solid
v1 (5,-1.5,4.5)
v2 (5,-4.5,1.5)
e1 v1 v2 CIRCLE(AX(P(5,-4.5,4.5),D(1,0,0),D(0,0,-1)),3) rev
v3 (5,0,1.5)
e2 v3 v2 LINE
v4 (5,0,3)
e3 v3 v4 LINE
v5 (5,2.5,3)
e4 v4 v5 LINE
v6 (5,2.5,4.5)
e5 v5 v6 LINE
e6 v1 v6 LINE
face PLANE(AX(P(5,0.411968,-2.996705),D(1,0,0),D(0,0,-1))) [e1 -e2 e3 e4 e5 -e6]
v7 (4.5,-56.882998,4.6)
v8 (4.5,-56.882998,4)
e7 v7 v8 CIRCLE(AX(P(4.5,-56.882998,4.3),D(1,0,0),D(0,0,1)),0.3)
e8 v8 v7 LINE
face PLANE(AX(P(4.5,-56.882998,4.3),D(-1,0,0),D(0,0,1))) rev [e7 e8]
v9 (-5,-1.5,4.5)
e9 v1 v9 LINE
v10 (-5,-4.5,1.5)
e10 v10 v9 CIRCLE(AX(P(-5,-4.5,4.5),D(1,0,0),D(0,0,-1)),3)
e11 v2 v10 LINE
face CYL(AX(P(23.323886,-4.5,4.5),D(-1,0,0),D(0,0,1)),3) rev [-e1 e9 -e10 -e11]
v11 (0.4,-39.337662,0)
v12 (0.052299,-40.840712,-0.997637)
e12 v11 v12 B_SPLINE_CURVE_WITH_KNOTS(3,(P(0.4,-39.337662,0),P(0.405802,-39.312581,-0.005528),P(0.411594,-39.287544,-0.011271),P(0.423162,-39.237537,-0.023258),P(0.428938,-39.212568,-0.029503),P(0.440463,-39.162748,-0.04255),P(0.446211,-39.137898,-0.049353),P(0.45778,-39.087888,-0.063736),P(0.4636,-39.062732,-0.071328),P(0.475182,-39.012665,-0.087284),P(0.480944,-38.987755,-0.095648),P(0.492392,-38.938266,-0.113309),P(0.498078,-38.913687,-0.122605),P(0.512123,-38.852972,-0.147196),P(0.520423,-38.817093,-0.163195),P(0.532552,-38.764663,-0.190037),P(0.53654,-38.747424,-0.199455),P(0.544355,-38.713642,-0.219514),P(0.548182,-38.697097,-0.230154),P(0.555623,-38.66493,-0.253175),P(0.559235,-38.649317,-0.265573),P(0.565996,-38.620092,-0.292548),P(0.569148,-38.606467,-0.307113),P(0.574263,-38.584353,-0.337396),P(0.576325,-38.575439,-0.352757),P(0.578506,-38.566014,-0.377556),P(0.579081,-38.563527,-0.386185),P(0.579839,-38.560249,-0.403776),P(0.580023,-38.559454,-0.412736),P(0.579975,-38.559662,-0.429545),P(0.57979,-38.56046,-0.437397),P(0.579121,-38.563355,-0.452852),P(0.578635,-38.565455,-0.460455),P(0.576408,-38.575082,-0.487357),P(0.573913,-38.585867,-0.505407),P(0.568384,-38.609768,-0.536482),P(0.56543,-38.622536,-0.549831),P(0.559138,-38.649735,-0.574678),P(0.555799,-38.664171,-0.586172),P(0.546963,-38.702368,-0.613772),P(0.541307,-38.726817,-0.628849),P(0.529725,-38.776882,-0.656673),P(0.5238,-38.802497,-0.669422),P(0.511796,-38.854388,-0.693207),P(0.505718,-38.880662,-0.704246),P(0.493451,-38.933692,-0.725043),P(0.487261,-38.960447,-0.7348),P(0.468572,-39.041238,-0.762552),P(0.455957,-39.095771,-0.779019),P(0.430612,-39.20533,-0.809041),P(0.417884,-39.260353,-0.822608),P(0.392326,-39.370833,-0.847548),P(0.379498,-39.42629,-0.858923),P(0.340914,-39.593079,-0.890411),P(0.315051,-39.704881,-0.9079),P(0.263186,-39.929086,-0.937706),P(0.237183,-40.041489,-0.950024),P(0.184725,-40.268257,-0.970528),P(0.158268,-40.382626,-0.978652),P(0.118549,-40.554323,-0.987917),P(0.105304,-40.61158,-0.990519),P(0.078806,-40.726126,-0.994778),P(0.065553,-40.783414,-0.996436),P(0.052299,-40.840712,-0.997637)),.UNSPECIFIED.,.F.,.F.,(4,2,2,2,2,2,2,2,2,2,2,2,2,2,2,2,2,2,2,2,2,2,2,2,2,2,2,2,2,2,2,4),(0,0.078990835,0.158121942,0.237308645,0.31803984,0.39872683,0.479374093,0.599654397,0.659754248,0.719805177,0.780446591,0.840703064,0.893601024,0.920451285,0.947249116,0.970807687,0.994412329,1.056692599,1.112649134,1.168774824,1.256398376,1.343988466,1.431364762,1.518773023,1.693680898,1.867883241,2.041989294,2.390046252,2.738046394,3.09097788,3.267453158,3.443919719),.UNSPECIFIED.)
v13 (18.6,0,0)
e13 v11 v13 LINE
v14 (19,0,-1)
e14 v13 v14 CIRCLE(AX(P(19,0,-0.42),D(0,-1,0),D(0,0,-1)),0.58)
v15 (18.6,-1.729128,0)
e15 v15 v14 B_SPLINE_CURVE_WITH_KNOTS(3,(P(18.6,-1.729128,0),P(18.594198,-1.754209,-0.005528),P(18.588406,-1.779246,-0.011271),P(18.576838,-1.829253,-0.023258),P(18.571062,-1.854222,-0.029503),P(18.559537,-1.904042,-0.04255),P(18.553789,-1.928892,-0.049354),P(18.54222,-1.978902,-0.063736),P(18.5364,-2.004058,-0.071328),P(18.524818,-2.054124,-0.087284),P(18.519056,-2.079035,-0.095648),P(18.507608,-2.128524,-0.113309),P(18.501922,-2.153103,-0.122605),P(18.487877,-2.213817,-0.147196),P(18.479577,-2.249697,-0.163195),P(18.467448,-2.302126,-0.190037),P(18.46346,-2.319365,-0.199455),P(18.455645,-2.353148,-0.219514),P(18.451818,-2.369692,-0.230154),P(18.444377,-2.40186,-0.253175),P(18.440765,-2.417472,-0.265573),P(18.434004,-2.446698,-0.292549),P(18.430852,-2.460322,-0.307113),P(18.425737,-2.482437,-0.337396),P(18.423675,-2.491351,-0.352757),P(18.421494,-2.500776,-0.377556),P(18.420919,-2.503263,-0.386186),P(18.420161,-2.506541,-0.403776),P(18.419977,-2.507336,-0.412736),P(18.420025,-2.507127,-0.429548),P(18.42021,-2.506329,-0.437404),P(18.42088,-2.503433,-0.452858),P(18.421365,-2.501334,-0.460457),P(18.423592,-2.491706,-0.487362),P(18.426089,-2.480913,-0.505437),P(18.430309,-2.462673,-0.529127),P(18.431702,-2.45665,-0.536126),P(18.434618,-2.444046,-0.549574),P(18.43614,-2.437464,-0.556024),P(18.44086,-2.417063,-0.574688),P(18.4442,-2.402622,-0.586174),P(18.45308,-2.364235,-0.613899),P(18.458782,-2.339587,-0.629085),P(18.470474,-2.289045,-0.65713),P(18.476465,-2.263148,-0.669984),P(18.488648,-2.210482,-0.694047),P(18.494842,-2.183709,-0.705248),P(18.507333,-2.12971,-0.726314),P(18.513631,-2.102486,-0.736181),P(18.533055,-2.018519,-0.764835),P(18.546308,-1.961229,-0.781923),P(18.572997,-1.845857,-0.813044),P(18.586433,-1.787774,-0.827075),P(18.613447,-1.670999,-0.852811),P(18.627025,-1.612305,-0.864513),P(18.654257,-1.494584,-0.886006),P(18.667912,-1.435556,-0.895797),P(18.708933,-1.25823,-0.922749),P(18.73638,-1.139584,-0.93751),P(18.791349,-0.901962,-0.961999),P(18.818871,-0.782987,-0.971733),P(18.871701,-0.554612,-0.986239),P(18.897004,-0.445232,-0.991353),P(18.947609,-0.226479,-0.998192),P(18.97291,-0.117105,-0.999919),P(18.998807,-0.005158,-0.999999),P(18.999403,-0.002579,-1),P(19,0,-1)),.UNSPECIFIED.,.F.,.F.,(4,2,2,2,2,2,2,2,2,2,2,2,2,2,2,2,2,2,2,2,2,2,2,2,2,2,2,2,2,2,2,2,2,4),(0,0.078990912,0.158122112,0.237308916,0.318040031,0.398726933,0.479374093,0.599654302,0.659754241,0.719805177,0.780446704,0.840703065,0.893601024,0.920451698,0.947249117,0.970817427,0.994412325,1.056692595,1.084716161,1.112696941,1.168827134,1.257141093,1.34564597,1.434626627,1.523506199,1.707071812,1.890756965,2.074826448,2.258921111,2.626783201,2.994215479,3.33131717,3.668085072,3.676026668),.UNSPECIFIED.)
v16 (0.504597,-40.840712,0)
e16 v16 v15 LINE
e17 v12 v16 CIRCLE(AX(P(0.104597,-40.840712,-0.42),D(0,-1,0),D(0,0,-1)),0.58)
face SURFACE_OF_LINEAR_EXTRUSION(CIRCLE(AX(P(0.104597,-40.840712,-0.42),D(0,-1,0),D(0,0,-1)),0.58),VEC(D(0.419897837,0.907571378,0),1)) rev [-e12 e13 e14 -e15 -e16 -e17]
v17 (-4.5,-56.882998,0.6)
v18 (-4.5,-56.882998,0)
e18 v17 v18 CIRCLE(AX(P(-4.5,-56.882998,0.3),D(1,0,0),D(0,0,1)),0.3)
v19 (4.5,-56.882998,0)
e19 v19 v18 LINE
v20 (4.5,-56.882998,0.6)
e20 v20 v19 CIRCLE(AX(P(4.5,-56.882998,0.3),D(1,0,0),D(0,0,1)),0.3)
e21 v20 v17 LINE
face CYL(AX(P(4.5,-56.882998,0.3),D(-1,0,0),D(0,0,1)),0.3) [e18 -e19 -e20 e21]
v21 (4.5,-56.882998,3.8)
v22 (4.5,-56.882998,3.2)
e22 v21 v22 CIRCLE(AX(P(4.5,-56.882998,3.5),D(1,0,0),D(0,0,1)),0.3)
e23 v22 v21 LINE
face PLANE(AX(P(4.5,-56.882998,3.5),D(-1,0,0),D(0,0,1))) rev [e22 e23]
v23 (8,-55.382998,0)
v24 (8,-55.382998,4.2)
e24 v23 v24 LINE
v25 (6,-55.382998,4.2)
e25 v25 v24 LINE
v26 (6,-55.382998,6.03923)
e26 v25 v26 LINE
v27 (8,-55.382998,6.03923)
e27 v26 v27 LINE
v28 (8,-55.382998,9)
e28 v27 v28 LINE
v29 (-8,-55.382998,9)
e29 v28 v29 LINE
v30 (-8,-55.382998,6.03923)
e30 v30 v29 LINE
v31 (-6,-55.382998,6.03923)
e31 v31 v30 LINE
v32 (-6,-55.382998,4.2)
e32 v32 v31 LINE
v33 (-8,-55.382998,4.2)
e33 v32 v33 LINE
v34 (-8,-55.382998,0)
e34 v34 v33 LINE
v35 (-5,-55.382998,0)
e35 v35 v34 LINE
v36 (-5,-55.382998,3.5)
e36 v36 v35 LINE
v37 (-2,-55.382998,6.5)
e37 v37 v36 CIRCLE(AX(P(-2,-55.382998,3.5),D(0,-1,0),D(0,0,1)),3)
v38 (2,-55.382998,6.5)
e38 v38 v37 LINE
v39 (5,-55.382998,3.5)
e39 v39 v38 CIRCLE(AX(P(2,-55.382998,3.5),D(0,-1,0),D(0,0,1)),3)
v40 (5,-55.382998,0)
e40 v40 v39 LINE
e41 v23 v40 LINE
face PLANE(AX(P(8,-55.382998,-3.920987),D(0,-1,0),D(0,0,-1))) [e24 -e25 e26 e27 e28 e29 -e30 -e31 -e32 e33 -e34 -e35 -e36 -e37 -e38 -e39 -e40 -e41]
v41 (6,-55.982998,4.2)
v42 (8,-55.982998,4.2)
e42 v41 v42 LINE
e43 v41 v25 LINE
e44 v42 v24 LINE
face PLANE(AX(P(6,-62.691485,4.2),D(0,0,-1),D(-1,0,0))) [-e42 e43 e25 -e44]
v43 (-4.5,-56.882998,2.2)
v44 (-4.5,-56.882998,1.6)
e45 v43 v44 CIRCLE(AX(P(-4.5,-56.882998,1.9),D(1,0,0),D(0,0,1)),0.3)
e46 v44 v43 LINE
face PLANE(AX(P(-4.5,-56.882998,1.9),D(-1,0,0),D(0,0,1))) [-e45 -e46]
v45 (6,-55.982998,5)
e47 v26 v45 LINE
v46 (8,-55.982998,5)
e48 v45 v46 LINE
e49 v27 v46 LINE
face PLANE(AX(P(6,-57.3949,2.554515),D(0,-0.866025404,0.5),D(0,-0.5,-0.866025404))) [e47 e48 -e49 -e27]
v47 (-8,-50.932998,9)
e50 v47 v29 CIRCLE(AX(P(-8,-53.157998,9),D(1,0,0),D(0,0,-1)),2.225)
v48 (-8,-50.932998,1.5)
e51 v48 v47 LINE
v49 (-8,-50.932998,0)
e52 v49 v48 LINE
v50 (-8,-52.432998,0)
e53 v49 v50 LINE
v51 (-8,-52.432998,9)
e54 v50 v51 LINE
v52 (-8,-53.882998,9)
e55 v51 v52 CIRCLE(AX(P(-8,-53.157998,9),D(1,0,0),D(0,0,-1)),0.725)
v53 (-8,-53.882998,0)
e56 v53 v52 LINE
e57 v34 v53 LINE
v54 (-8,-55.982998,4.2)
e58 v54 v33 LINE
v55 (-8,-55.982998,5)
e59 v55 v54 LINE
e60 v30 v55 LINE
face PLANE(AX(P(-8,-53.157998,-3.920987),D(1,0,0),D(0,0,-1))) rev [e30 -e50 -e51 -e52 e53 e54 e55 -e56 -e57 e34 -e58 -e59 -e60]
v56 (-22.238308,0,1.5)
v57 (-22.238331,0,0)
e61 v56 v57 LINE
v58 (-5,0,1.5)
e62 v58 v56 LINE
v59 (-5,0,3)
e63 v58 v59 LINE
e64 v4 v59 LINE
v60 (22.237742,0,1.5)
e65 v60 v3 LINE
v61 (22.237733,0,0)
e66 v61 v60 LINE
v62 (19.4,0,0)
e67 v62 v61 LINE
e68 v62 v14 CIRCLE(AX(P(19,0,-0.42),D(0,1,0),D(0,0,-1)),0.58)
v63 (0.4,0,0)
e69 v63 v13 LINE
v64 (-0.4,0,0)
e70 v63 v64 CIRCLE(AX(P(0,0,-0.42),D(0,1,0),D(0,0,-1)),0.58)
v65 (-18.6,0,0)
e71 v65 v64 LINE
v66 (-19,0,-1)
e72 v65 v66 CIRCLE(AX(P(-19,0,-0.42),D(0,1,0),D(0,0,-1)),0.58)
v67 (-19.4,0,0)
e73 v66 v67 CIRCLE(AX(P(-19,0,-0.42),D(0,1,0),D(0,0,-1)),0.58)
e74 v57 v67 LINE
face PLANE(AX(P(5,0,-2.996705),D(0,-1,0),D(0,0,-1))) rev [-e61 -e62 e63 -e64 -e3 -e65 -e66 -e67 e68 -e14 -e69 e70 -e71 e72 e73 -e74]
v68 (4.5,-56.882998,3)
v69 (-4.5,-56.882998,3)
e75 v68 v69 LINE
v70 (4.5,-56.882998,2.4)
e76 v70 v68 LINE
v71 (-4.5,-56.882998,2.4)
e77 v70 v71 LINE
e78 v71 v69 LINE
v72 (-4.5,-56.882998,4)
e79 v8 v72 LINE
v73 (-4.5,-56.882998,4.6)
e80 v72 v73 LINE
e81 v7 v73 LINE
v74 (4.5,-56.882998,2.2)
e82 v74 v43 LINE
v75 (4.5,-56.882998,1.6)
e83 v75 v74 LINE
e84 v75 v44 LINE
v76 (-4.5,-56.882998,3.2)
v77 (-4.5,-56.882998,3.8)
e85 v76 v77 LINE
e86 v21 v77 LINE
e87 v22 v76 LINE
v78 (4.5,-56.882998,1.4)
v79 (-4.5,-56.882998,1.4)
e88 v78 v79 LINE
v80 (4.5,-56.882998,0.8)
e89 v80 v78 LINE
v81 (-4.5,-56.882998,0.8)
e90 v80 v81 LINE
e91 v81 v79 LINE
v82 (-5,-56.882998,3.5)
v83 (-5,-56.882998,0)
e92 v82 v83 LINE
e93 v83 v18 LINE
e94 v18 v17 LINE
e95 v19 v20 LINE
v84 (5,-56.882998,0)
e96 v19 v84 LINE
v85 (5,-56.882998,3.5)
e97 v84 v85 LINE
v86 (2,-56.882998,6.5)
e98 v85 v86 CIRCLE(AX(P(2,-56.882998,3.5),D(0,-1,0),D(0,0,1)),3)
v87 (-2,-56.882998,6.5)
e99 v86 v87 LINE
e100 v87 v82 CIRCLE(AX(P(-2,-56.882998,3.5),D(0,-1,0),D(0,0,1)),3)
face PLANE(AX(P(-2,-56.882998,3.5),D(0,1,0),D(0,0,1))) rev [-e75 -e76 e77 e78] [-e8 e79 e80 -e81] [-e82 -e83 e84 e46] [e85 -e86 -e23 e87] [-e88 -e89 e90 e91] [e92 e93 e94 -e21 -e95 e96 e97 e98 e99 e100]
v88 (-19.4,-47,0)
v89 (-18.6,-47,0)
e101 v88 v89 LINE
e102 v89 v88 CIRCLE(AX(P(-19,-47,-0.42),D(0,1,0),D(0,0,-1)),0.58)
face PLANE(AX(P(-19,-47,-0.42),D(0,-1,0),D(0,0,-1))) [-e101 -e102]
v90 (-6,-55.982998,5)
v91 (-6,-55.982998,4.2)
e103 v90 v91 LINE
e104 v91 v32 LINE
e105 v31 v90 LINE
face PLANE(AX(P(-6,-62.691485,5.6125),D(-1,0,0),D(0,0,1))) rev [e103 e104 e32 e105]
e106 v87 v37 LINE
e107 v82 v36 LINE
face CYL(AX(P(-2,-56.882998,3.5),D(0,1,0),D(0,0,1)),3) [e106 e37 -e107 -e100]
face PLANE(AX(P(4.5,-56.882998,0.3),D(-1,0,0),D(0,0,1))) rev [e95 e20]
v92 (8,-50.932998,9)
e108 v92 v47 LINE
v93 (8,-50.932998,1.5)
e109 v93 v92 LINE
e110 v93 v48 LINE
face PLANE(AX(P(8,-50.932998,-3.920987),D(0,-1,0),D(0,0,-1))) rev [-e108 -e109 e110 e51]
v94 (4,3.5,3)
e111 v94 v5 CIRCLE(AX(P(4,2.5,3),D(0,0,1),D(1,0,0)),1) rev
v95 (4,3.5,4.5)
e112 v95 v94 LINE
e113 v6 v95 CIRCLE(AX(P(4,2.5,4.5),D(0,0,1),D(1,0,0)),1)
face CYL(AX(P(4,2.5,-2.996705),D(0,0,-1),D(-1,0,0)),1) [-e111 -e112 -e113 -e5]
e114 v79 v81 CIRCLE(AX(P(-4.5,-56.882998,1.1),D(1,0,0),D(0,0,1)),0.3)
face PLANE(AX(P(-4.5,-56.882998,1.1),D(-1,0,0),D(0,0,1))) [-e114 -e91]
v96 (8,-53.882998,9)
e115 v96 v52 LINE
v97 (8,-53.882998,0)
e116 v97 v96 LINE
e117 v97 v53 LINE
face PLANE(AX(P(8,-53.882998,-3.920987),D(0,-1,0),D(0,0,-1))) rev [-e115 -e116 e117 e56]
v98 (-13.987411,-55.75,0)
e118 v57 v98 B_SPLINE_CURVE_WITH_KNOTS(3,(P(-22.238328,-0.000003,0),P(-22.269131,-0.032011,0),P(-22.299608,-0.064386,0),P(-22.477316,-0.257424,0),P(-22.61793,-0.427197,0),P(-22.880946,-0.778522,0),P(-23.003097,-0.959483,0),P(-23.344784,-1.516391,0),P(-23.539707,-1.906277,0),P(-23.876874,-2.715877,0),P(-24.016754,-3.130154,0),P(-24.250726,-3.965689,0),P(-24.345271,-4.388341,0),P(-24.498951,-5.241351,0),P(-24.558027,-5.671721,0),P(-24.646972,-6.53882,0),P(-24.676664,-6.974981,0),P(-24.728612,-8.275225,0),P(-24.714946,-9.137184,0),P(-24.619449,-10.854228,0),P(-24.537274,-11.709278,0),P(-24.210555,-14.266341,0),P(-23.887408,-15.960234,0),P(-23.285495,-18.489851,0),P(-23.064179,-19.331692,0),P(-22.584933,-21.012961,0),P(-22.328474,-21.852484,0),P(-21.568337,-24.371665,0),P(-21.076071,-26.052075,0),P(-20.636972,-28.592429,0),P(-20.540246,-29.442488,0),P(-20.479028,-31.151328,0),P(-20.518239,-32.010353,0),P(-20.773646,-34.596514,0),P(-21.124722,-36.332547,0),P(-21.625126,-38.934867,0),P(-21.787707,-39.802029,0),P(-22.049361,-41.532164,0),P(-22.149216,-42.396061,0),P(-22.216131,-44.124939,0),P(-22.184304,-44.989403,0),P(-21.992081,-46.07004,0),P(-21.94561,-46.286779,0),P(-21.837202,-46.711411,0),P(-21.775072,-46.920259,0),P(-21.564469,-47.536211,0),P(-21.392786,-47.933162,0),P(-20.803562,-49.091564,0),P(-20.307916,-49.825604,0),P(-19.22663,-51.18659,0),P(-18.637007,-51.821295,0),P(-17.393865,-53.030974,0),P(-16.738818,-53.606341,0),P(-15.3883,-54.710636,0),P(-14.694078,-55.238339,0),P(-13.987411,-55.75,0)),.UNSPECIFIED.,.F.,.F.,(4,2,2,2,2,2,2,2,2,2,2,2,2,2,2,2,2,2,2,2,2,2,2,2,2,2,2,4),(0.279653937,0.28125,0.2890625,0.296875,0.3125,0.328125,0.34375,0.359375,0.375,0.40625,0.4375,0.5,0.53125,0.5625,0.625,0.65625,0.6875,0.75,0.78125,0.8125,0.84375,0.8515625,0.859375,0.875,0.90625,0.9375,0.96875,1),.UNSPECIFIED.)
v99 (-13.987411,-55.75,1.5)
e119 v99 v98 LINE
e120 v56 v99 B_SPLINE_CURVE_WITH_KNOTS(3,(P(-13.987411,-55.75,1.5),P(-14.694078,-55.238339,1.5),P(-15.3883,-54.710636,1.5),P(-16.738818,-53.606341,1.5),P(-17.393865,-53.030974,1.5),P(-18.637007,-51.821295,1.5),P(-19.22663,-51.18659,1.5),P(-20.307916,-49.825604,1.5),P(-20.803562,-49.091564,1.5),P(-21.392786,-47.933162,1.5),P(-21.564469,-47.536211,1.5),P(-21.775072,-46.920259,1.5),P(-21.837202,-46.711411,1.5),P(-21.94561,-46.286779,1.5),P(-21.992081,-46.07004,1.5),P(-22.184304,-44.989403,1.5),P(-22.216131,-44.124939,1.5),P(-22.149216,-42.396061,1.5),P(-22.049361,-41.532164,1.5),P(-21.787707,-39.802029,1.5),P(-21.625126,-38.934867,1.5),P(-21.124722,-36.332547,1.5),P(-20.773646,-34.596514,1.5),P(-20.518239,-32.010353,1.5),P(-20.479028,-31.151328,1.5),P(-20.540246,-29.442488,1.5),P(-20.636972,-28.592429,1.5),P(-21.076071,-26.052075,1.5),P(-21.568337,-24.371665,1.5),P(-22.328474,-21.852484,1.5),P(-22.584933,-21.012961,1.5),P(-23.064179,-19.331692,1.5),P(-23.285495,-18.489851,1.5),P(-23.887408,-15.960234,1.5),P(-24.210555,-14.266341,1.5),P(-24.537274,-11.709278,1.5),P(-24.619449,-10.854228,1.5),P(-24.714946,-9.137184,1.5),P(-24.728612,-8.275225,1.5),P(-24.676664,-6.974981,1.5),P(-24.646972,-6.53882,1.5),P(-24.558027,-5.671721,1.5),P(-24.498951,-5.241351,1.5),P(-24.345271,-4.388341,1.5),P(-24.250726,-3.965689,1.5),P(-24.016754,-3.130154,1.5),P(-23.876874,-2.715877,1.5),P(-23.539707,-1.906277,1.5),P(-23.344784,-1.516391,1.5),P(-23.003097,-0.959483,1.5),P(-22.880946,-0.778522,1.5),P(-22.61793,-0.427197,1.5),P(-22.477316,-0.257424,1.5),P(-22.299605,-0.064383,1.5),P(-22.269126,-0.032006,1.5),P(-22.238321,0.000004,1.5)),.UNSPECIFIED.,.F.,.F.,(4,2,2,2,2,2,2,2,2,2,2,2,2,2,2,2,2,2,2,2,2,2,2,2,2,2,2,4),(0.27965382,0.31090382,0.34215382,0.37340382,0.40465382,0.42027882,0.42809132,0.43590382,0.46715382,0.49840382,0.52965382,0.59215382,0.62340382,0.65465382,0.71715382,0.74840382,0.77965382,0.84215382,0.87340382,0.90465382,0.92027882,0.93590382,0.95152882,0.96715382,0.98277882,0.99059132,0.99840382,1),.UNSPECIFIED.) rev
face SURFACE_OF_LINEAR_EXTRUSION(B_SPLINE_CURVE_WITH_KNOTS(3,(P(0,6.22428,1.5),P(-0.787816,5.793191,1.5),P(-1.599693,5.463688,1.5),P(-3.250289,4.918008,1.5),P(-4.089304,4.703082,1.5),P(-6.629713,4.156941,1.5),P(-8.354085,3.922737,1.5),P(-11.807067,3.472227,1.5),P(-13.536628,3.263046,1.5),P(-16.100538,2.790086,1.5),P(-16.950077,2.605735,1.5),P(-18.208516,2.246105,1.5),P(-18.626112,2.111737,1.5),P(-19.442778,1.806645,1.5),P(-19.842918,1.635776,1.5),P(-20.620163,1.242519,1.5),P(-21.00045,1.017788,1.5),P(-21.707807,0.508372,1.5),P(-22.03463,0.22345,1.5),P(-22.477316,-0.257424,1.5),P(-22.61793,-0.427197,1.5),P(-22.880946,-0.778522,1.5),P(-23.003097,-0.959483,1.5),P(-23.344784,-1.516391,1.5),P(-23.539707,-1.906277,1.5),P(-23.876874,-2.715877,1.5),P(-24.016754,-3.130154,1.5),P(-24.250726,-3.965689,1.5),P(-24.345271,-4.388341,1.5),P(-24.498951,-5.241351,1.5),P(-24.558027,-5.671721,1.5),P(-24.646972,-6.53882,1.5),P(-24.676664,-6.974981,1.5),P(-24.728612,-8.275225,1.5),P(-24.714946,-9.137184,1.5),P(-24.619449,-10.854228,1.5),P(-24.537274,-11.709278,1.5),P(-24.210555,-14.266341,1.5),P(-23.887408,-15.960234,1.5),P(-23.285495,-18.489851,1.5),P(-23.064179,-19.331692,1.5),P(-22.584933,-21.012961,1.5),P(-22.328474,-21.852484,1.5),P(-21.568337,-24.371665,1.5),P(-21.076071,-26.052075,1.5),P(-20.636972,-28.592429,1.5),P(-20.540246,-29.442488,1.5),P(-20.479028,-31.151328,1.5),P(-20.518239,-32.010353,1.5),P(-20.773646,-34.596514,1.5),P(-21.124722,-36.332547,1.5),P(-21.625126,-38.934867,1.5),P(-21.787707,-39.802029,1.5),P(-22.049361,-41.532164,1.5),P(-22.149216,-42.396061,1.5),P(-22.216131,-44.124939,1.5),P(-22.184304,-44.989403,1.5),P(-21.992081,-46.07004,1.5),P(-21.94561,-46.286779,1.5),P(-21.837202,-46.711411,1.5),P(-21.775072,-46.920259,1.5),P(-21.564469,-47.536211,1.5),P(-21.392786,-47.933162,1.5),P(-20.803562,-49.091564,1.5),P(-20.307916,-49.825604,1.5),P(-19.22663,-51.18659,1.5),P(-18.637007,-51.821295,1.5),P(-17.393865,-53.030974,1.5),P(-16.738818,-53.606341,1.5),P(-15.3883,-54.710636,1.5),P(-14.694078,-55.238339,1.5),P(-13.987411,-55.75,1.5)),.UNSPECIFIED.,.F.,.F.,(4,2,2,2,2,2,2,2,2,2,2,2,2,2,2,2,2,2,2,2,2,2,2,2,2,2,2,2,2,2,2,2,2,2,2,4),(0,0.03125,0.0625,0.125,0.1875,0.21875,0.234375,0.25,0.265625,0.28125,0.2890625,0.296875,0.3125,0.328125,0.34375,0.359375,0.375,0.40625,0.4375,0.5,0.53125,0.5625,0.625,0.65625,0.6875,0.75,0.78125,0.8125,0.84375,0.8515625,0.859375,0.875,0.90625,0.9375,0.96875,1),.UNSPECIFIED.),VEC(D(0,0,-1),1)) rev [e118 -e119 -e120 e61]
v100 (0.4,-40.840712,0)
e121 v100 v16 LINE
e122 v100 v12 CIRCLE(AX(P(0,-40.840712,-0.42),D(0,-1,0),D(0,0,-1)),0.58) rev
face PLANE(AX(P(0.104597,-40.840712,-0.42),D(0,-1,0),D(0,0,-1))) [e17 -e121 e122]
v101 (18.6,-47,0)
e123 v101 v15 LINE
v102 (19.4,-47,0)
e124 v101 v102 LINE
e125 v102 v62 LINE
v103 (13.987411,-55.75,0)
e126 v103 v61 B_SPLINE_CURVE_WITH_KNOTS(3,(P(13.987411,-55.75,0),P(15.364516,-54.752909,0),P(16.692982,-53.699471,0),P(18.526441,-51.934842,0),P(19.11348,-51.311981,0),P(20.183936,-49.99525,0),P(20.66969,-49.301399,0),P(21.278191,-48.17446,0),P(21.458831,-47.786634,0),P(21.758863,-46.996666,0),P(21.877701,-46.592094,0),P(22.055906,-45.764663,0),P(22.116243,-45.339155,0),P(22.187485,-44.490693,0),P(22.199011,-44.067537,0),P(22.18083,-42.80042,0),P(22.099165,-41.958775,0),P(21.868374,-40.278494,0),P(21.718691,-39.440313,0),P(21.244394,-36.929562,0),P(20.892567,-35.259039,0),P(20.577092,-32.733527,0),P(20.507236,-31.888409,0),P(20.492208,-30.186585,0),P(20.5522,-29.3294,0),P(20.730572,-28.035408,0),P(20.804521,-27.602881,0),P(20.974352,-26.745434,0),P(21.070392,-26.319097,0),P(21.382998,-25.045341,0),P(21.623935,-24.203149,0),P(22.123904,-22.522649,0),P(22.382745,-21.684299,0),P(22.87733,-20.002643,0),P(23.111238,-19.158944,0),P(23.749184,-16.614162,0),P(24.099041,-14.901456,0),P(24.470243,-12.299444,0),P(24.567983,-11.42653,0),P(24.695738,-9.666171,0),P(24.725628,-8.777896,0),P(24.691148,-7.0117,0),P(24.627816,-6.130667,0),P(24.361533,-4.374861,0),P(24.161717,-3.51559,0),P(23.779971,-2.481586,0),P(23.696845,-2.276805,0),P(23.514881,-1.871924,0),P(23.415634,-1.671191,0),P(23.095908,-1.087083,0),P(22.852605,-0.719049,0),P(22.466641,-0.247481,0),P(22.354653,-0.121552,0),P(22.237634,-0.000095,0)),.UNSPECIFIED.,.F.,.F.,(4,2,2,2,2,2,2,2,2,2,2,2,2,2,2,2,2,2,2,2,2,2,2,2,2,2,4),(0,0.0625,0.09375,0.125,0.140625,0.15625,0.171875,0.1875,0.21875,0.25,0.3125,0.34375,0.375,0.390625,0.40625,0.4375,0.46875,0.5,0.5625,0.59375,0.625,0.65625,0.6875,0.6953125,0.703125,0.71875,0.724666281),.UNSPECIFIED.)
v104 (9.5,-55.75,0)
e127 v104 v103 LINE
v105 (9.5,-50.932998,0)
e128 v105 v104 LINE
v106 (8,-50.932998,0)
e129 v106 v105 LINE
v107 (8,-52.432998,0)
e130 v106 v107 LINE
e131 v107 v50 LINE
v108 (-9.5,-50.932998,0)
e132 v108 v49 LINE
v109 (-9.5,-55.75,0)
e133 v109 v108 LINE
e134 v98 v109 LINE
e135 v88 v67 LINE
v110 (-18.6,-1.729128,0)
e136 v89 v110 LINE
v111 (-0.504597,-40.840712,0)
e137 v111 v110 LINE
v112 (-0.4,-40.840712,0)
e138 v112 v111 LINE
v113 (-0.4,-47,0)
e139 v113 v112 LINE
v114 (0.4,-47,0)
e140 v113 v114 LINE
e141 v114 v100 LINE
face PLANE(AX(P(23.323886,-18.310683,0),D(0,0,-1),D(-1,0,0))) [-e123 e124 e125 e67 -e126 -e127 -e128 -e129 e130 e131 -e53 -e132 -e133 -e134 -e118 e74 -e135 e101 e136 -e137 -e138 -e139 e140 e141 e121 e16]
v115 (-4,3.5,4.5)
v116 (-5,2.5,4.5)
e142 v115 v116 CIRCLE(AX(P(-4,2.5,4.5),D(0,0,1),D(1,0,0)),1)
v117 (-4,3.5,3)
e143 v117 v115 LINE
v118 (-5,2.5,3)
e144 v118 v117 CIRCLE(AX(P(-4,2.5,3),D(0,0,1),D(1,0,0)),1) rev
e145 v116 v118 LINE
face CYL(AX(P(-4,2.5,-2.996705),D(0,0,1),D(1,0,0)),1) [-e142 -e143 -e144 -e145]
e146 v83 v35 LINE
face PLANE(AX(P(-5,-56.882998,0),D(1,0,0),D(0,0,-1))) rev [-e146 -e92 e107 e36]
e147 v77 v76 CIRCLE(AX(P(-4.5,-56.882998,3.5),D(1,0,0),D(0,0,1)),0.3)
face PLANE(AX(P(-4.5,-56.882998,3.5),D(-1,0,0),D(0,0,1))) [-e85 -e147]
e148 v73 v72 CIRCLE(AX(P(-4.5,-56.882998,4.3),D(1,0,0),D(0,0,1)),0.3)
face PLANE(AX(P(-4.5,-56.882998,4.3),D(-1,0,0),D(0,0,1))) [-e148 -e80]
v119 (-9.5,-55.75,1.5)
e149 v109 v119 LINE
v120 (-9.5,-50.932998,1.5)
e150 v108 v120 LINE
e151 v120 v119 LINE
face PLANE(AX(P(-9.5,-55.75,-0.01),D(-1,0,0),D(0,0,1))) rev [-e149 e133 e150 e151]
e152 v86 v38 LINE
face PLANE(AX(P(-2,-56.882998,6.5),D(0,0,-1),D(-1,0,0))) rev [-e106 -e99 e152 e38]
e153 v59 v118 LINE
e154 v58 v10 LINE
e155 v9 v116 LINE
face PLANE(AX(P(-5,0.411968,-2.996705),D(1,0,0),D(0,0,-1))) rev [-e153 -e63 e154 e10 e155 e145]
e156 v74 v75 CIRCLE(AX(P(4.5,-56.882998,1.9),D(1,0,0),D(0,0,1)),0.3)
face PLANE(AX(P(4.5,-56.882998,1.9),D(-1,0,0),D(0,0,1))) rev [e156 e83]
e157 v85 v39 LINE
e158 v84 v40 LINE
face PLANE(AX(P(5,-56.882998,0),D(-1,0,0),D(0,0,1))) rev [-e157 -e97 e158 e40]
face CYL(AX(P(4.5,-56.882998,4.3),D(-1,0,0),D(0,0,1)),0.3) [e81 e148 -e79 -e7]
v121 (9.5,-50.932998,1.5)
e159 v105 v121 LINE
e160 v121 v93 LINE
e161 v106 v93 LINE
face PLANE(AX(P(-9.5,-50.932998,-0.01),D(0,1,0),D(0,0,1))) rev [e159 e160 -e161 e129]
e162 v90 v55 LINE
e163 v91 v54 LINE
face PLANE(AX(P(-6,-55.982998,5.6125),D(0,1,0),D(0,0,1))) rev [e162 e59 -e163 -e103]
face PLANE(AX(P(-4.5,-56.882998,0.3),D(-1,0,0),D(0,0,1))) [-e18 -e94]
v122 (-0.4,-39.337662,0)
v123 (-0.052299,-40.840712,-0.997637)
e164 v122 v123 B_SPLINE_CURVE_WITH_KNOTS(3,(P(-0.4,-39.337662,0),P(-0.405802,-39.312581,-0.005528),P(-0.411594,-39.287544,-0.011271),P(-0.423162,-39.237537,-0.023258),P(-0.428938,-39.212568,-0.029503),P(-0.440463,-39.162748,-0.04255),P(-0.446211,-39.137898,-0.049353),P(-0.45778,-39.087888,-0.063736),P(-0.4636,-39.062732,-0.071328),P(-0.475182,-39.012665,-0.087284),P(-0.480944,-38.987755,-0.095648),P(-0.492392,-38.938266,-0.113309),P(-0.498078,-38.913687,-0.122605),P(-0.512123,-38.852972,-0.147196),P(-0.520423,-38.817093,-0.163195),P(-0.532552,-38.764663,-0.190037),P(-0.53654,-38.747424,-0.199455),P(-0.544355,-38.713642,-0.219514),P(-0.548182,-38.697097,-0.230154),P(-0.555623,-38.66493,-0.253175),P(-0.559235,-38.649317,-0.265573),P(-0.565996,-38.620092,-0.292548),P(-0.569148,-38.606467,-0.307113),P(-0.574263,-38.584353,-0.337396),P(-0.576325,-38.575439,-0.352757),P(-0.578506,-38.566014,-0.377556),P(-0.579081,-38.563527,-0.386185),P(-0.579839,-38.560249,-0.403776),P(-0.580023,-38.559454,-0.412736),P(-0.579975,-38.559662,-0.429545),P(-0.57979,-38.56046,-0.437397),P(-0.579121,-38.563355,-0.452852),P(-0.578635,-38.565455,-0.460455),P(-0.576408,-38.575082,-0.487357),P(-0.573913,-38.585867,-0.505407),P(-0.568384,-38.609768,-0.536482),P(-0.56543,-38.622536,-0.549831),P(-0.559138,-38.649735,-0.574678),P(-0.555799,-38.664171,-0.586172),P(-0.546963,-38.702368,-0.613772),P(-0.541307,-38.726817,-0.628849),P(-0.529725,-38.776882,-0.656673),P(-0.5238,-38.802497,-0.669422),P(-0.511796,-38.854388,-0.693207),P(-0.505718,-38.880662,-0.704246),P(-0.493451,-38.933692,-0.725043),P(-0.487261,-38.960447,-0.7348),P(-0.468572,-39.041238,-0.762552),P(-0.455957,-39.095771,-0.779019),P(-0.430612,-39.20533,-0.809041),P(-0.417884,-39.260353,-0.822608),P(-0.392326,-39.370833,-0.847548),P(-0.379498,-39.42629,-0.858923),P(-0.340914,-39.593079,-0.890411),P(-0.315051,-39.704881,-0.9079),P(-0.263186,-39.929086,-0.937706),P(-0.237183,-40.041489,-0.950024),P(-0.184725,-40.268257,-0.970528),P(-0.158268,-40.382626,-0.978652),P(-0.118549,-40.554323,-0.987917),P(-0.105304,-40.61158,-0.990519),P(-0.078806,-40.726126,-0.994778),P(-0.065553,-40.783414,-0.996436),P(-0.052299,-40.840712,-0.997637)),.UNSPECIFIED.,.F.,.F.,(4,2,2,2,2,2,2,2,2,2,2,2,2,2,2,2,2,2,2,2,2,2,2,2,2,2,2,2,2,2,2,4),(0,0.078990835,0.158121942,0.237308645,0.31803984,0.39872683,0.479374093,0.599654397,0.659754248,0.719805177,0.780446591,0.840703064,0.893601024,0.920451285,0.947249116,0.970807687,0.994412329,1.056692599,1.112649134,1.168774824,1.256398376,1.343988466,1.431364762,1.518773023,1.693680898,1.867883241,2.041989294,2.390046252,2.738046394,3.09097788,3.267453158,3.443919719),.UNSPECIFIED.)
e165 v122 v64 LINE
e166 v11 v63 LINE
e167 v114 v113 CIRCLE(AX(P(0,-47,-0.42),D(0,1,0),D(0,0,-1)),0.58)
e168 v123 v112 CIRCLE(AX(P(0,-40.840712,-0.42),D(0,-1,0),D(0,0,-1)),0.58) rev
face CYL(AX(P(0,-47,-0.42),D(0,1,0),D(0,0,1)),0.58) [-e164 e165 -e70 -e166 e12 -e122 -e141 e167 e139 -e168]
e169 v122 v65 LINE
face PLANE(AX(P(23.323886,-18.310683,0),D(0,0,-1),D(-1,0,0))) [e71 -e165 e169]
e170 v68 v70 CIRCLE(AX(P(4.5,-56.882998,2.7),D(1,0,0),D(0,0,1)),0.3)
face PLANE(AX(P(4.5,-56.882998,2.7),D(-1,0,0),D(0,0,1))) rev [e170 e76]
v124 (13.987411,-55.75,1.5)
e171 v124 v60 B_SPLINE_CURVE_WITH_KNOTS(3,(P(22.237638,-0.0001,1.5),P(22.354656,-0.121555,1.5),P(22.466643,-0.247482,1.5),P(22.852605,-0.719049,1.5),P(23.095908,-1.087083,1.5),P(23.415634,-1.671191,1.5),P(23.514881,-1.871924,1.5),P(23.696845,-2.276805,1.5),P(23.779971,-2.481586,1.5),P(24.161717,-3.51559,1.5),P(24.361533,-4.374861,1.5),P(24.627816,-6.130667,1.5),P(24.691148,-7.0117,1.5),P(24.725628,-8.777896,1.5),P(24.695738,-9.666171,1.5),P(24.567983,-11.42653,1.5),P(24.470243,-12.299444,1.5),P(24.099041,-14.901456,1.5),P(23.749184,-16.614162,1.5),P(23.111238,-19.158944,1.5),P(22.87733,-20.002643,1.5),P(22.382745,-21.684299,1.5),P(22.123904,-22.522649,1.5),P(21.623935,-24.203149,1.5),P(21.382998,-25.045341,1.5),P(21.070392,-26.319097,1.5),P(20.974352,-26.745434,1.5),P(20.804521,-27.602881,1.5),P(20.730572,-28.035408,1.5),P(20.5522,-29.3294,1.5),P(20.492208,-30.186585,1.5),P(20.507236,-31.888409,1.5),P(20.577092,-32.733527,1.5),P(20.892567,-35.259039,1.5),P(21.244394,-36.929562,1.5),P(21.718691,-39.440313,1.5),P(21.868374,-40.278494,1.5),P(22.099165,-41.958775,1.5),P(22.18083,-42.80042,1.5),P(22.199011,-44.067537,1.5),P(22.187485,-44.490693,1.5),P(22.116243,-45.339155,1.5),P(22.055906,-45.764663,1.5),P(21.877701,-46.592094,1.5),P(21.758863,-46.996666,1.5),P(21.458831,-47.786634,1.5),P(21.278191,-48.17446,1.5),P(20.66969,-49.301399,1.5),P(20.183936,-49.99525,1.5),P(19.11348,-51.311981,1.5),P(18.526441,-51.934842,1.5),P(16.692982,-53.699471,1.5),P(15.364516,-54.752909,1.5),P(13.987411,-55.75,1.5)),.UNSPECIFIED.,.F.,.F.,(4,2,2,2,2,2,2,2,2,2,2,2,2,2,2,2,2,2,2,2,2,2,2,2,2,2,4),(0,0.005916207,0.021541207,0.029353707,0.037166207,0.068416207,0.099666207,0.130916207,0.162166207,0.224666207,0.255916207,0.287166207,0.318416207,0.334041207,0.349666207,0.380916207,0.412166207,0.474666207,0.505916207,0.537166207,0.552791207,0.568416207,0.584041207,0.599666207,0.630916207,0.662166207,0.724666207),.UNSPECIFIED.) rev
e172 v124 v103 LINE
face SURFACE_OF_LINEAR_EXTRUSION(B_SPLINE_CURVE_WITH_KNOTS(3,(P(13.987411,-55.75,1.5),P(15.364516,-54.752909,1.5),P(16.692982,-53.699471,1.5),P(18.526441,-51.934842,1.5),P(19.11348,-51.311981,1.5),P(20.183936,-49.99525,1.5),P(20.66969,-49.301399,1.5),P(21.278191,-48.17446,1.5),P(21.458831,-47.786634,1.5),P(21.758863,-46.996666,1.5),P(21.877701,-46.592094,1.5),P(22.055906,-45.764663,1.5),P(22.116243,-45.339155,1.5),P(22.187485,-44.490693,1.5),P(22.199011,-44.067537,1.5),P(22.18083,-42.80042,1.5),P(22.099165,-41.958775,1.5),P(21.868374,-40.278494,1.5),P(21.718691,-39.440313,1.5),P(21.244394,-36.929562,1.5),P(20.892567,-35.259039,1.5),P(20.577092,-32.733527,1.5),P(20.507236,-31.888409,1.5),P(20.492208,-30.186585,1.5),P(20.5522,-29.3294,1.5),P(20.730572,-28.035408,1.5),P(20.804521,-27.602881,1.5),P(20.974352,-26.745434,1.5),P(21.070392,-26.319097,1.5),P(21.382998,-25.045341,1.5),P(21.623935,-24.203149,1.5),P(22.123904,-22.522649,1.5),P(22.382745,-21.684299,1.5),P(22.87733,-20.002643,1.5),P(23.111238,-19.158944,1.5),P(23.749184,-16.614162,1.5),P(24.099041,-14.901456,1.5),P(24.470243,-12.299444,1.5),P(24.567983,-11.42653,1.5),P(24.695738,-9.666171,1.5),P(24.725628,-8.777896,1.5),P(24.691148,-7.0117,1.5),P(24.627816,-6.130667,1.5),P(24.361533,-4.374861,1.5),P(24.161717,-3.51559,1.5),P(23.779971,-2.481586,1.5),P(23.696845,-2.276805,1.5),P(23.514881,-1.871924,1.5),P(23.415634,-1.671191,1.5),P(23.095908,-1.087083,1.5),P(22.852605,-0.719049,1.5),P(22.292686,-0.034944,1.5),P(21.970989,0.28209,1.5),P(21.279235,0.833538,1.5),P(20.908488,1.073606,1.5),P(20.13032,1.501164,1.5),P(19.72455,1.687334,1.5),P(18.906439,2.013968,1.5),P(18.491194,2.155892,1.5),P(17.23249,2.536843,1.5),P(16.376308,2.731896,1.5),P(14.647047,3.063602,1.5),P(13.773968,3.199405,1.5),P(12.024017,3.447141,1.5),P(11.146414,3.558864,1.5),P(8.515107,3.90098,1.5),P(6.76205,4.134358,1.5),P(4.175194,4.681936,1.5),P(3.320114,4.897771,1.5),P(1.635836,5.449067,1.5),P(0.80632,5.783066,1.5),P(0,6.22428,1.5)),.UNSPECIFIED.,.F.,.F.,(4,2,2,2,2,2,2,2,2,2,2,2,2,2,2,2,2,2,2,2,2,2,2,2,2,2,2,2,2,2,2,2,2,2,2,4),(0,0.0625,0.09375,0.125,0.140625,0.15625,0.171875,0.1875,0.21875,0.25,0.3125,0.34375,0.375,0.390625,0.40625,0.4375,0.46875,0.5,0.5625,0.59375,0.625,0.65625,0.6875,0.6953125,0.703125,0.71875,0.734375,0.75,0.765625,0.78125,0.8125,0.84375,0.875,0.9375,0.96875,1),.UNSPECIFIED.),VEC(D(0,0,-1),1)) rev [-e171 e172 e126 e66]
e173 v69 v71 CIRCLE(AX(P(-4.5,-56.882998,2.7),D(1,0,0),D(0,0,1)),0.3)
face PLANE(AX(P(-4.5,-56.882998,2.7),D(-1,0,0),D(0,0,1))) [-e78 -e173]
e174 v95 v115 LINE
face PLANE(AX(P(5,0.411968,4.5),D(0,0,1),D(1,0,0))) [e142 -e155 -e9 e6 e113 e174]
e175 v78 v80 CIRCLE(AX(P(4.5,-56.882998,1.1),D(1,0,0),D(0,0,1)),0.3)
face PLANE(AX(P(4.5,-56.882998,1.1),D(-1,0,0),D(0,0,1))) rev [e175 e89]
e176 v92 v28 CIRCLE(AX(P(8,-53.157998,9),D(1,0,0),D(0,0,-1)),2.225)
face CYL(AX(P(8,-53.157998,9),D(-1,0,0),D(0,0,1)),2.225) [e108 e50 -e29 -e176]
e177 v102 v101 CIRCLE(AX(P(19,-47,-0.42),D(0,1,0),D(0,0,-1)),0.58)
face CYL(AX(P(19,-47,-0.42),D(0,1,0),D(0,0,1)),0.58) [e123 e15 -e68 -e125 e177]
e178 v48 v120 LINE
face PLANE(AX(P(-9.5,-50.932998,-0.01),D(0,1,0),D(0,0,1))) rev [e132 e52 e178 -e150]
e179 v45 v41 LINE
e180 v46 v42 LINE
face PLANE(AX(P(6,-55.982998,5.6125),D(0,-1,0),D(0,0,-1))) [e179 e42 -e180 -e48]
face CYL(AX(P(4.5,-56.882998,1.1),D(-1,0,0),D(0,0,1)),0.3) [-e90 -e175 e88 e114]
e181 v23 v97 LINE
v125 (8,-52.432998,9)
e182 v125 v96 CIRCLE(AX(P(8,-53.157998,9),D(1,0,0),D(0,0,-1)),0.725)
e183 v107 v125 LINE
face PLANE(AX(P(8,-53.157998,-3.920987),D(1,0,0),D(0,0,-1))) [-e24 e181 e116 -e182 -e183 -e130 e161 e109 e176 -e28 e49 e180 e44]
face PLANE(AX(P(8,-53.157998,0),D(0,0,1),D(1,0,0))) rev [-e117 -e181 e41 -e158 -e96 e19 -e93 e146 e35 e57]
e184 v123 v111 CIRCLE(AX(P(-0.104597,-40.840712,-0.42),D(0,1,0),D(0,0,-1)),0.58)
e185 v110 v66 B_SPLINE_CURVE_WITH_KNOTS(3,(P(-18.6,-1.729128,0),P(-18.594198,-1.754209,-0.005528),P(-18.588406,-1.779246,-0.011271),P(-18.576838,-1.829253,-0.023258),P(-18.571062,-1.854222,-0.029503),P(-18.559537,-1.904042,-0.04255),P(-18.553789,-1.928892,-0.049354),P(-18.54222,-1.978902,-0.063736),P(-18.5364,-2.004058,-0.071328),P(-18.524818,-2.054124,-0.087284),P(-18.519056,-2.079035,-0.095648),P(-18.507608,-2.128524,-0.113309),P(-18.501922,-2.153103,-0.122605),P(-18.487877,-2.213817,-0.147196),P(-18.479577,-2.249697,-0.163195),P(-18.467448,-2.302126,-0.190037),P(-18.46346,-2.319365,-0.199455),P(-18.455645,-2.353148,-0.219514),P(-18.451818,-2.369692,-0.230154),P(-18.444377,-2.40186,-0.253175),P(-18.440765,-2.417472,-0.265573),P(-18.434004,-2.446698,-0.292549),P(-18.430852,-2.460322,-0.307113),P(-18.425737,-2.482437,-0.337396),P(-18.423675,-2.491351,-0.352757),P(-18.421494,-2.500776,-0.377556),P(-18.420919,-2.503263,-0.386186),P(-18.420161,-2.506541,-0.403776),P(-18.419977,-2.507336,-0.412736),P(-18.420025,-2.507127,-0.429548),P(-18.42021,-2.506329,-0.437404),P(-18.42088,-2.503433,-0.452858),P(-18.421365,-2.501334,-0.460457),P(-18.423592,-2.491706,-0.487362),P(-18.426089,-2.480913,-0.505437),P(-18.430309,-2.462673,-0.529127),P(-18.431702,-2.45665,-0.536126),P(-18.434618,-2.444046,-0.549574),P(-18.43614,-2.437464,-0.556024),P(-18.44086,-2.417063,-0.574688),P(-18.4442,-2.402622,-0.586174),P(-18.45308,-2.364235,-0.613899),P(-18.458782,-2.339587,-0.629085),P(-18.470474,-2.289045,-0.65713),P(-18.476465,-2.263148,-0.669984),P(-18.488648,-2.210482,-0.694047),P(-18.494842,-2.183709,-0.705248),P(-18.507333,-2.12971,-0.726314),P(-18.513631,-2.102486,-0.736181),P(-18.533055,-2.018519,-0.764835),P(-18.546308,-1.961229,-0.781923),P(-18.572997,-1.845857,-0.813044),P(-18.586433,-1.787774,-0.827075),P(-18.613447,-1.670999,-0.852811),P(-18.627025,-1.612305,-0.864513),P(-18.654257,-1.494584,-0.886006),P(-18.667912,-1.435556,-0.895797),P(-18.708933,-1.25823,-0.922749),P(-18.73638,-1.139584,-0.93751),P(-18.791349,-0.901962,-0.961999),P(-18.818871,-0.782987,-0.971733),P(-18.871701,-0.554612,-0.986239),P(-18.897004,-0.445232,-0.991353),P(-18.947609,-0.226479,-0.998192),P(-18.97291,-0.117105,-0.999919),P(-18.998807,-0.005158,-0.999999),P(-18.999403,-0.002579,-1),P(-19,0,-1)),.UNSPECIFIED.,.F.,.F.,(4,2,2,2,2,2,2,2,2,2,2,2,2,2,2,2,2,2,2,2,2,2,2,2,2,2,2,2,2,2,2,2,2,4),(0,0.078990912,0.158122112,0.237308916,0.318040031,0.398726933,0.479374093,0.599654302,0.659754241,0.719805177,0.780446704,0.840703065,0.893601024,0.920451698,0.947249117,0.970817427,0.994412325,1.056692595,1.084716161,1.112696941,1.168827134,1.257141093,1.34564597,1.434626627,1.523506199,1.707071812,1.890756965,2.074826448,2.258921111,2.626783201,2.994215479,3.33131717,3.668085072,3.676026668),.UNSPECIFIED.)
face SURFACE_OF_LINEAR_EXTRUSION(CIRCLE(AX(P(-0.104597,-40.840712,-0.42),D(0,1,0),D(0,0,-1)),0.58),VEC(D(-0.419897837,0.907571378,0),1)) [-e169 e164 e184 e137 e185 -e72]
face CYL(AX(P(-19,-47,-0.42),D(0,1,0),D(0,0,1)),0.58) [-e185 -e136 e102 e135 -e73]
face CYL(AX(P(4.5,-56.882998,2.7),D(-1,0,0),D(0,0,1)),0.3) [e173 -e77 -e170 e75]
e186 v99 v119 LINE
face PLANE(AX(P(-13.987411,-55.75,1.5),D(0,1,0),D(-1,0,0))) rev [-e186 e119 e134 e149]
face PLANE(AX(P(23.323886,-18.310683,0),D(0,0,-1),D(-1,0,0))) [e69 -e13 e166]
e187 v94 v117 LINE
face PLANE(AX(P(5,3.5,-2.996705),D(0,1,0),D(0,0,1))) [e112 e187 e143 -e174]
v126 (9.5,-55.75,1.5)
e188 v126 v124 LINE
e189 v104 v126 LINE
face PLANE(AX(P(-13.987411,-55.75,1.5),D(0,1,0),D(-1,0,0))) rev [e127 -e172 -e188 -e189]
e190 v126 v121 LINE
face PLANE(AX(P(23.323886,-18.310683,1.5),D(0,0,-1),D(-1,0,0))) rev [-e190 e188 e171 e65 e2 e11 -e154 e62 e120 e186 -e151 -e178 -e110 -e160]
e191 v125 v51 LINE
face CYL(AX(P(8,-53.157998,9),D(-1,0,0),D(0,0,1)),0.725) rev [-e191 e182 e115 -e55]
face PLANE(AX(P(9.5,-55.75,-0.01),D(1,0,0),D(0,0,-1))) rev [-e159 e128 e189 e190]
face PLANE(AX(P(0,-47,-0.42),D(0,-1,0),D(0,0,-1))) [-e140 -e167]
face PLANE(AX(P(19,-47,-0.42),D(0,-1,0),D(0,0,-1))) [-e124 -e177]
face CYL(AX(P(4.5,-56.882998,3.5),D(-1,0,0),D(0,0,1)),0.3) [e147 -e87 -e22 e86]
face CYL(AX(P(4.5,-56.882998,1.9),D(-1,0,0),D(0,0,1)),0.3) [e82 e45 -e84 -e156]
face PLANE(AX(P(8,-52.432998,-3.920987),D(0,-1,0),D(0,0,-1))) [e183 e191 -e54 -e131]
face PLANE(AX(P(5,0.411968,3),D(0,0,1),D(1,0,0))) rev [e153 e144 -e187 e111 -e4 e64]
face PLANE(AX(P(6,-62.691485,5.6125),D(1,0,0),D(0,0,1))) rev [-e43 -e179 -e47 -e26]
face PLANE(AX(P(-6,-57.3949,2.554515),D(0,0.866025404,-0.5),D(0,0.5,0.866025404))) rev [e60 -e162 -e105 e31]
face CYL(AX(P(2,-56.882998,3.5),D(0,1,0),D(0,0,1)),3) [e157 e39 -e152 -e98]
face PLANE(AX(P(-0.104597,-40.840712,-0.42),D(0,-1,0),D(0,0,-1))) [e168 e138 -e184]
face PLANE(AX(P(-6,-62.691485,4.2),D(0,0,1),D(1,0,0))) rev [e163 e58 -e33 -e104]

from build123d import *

# Parameters (mm, degrees)
LOW_PLATE_DEPTH     = 1.5
SKETCH3_W           = 19
SKETCH3_H           = 4.817001744
CUT_EXTRUDE1_DEPTH  = 62.000496717
SKETCH5_W           = 9
SKETCH5_H           = 1.5
TONGUE_DEPTH        = 8
TONGUE_BUTTON_DEPTH = 1.5
SKETCH7_W           = 4.5
SKETCH7_H           = 1.5
SKETCH7_W_2         = 1.5
SKETCH7_H_2         = 3.5
BOSS_EXTRUDE4_DEPTH = 5
SKETCH8_W           = 3
SKETCH8_H           = 6.224279684
CUT_EXTRUDE2_DEPTH  = 30
FILLET_START        = -5
FILLET_3MM_DEPTH    = 10
FILLET2_R           = 1
SKETCH9_W           = 0.8
SKETCH9_H           = 0.6
RIGHT_CLIPS_DEPTH   = 2
CLIPS_RIBBS_DEPTH   = 4.5
BOSS_EXTRUDE7_DEPTH = 47
BOSS_EXTRUDE8_DEPTH = 45


with BuildPart() as part:
    # Sketch2 → Low Plate (new body)
    with BuildSketch(Plane.XY):
        with BuildLine():
            Line((-13.987410865, -55.75), (13.987410865, -55.75))
            add(Edge.make_bspline(
                [(13.987410865, -55.75), (15.364516245, -54.752908861), (16.692982198, -53.699471161), (18.526440715, -51.934841851), (19.113479504, -51.311981088), (20.183935625, -49.995249875), (20.669689967, -49.301399402), (21.278190693, -48.174460264), (21.458830968, -47.786634264), (21.758862818, -46.996665666), (21.877700551, -46.592093962), (22.0559056, -45.764663188), (22.116243051, -45.339154605), (22.18748451, -44.490693409), (22.199011375, -44.067536932), (22.180829682, -42.800419677), (22.099164736, -41.95877515), (21.868374402, -40.278493527), (21.718690582, -39.440313431), (21.244394379, -36.929561866), (20.892566631, -35.2590388), (20.577091845, -32.733527124), (20.507236183, -31.888409042), (20.492208023, -30.186585415), (20.552200399, -29.32939987), (20.73057206, -28.035407647), (20.804521311, -27.602881393), (20.974351767, -26.745434183), (21.070391606, -26.319097363), (21.382998298, -25.045340626), (21.623934502, -24.203149153), (22.12390442, -22.522649028), (22.38274515, -21.684298971), (22.877329959, -20.00264347), (23.11123752, -19.158944002), (23.749184146, -16.614162445), (24.099040974, -14.901455558), (24.470243393, -12.299444034), (24.567983481, -11.426529836), (24.695738389, -9.666170984), (24.725628098, -8.777896383), (24.691148458, -7.011699611), (24.627815746, -6.130667368), (24.361532714, -4.37486133), (24.161716694, -3.515589704), (23.779971484, -2.48158604), (23.696844615, -2.27680486), (23.514880537, -1.871923627), (23.415633783, -1.67119118), (23.09590805, -1.087082658), (22.852605055, -0.719048656), (22.29268626, -0.03494376), (21.970988856, 0.282090082), (21.279235232, 0.833537602), (20.908488239, 1.073605964), (20.130319718, 1.501163849), (19.724550492, 1.687333637), (18.906439227, 2.013968076), (18.491193707, 2.15589155), (17.232489601, 2.536842993), (16.376307609, 2.731895799), (14.647046711, 3.063601594), (13.773968133, 3.199405493), (12.024016772, 3.447140862), (11.146413812, 3.558864437), (8.515107441, 3.900980238), (6.762049959, 4.134358142), (4.175193681, 4.681936146), (3.320114283, 4.897770661), (1.63583587, 5.449066892), (0.806320369, 5.783065718), (0, 6.224279684)],
                knots=[0, 0, 0, 0, 0.0625, 0.0625, 0.09375, 0.09375, 0.125, 0.125, 0.140625, 0.140625, 0.15625, 0.15625, 0.171875, 0.171875, 0.1875, 0.1875, 0.21875, 0.21875, 0.25, 0.25, 0.3125, 0.3125, 0.34375, 0.34375, 0.375, 0.375, 0.390625, 0.390625, 0.40625, 0.40625, 0.4375, 0.4375, 0.46875, 0.46875, 0.5, 0.5, 0.5625, 0.5625, 0.59375, 0.59375, 0.625, 0.625, 0.65625, 0.65625, 0.6875, 0.6875, 0.6953125, 0.6953125, 0.703125, 0.703125, 0.71875, 0.71875, 0.734375, 0.734375, 0.75, 0.75, 0.765625, 0.765625, 0.78125, 0.78125, 0.8125, 0.8125, 0.84375, 0.84375, 0.875, 0.875, 0.9375, 0.9375, 0.96875, 0.96875, 1, 1, 1, 1], degree=3))
            add(Edge.make_bspline(
                [(0, 6.224279684), (-0.78781572, 5.793191358), (-1.59969269, 5.463688393), (-3.250288628, 4.918007999), (-4.089304063, 4.70308224), (-6.629712981, 4.156940709), (-8.354084583, 3.922737374), (-11.807066612, 3.47222681), (-13.536628271, 3.263046491), (-16.100537752, 2.790086115), (-16.950076528, 2.605735334), (-18.20851631, 2.246104635), (-18.626112374, 2.111737043), (-19.442777675, 1.806644848), (-19.842917847, 1.635776182), (-20.620162533, 1.242519333), (-21.000449987, 1.017788231), (-21.707807481, 0.508371536), (-22.034629769, 0.223449612), (-22.477316066, -0.257423908), (-22.617930469, -0.427196518), (-22.88094555, -0.778522223), (-23.003096797, -0.959483365), (-23.34478427, -1.516391451), (-23.539706693, -1.906276719), (-23.876874208, -2.715877414), (-24.01675437, -3.130154085), (-24.250726219, -3.965689427), (-24.345271274, -4.388340996), (-24.498951121, -5.241350614), (-24.558027347, -5.671721409), (-24.646972495, -6.538819504), (-24.676663881, -6.974981428), (-24.728611977, -8.275225371), (-24.714946447, -9.137184148), (-24.619449188, -10.854227556), (-24.537274438, -11.709277595), (-24.210555404, -14.266340556), (-23.887407569, -15.960234373), (-23.285495324, -18.489850781), (-23.064178692, -19.331692339), (-22.584933476, -21.012960688), (-22.328473597, -21.85248435), (-21.568336586, -24.371664938), (-21.076070946, -26.052074517), (-20.636971825, -28.592429374), (-20.540245663, -29.442488379), (-20.47902807, -31.15132802), (-20.518239419, -32.010352874), (-20.773645661, -34.596514295), (-21.124722079, -36.332547063), (-21.625125581, -38.934867442), (-21.787706997, -39.802029252), (-22.049361302, -41.532164124), (-22.149215918, -42.396061281), (-22.216131051, -44.124939117), (-22.184303618, -44.989402765), (-21.99208071, -46.070040071), (-21.945610298, -46.286779492), (-21.837202033, -46.711410531), (-21.775071919, -46.920258695), (-21.564469479, -47.536211191), (-21.392786311, -47.933161545), (-20.803562128, -49.091563627), (-20.307916123, -49.825604486), (-19.226630089, -51.186589759), (-18.637007111, -51.821294758), (-17.393865498, -53.030973568), (-16.738818031, -53.606341253), (-15.388299543, -54.710635735), (-14.694077635, -55.238338957), (-13.987410865, -55.75)],
                knots=[0, 0, 0, 0, 0.03125, 0.03125, 0.0625, 0.0625, 0.125, 0.125, 0.1875, 0.1875, 0.21875, 0.21875, 0.234375, 0.234375, 0.25, 0.25, 0.265625, 0.265625, 0.28125, 0.28125, 0.2890625, 0.2890625, 0.296875, 0.296875, 0.3125, 0.3125, 0.328125, 0.328125, 0.34375, 0.34375, 0.359375, 0.359375, 0.375, 0.375, 0.40625, 0.40625, 0.4375, 0.4375, 0.5, 0.5, 0.53125, 0.53125, 0.5625, 0.5625, 0.625, 0.625, 0.65625, 0.65625, 0.6875, 0.6875, 0.75, 0.75, 0.78125, 0.78125, 0.8125, 0.8125, 0.84375, 0.84375, 0.8515625, 0.8515625, 0.859375, 0.859375, 0.875, 0.875, 0.90625, 0.90625, 0.9375, 0.9375, 0.96875, 0.96875, 1, 1, 1, 1], degree=3))
        make_face()
    extrude(amount=LOW_PLATE_DEPTH)

    # Sketch3 → Cut-Extrude1 (cut, through all)
    with BuildSketch(Plane.XY.offset(1.5)):
        with Locations((0, -53.341499128)):
            Rectangle(SKETCH3_W, SKETCH3_H)
    extrude(amount=-CUT_EXTRUDE1_DEPTH, mode=Mode.SUBTRACT)

    # Sketch5 → Tongue (add, symmetric)
    with BuildSketch(Plane(origin=(0, 0, 0), x_dir=(0, 0, -1), z_dir=(1, 0, 0))):
        with Locations((-4.5, -51.682998256)):
            Rectangle(SKETCH5_W, SKETCH5_H)
        with BuildLine():
            ThreePointArc((-9, -52.432998256), (-9.725, -53.157998256), (-9, -53.882998256))
            Line((-9, -53.882998256), (-9, -55.382998256))
            ThreePointArc((-9, -55.382998256), (-11.225, -53.157998256), (-9, -50.932998256))
            Line((-9, -50.932998256), (-9, -52.432998256))
        make_face()
        with Locations((-4.5, -54.632998256)):
            Rectangle(SKETCH5_W, SKETCH5_H)
    extrude(amount=TONGUE_DEPTH, both=True)

    # Sketch6 → Tongue Button (add)
    with BuildSketch(Plane.XZ.offset(55.382998256)):
        with BuildLine():
            Line((-5, 0), (5, 0))
            Line((5, 0), (5, 3.5))
            ThreePointArc((5, 3.5), (4.121320344, 5.621320344), (2, 6.5))
            Line((2, 6.5), (-2, 6.5))
            ThreePointArc((-2, 6.5), (-4.121320344, 5.621320344), (-5, 3.5))
            Line((-5, 3.5), (-5, 0))
        make_face()
    extrude(amount=TONGUE_BUTTON_DEPTH)

    # Sketch7 → Boss-Extrude4 (add, symmetric)
    with BuildSketch(Plane(origin=(0, 0, 0), x_dir=(0, 0, -1), z_dir=(1, 0, 0))):
        with Locations((-2.25, -0.75)):
            Rectangle(SKETCH7_W, SKETCH7_H)
        with Locations((-3.75, 1.75)):
            Rectangle(SKETCH7_W_2, SKETCH7_H_2)
    extrude(amount=BOSS_EXTRUDE4_DEPTH, both=True)

    # Sketch8 → Cut-Extrude2 (cut, symmetric)
    with BuildSketch(Plane(origin=(0, 0, 0), x_dir=(0, 0, -1), z_dir=(1, 0, 0))):
        with Locations((-1.5, 3.112139842)):
            Rectangle(SKETCH8_W, SKETCH8_H)
    extrude(amount=CUT_EXTRUDE2_DEPTH, both=True, mode=Mode.SUBTRACT)

    # Fillet 3mm: read off the stored shape, not the designer's step
    # Fillet 3mm outline → Fillet 3mm (add)
    with BuildSketch(Plane.YZ.offset(FILLET_START)):
        with BuildLine():
            Line((-1.5, 1.5), (-1.5, 4.5))
            ThreePointArc((-1.5, 4.5), (-2.378679656, 2.378679656), (-4.5, 1.5))
            Line((-4.5, 1.5), (-1.5, 1.5))
        make_face()
    extrude(amount=FILLET_3MM_DEPTH)

    # Fillet2
    fillet2_edges = [part.edges().sort_by_distance(p)[0] for p in [
        (-5, 3.5, 3.75),
        (5, 3.5, 3.75),
    ]]
    fillet(fillet2_edges, radius=FILLET2_R)

    # Sketch9 → Right Clips (add)
    with BuildSketch(Plane.ZY.offset(8)):
        Polygon((5, -55.982998256), (6.039230485, -55.382998256), (5, -55.382998256), align=None)
        with Locations((4.6, -55.682998256)):
            Rectangle(SKETCH9_W, SKETCH9_H)
    right_clips = extrude(amount=-RIGHT_CLIPS_DEPTH)

    # Left Clips: Right Clips across plane
    add(right_clips.mirror(Plane(origin=(0, 0, 0), x_dir=(0, 0, 1), z_dir=(1, 0, 0))))

    # Sketch10 → Clips Ribbs (add, symmetric)
    with BuildSketch(Plane(origin=(0, 0, 0), x_dir=(0, 0, -1), z_dir=(1, 0, 0))):
        with BuildLine():
            Line((-0.6, -56.882998256), (0, -56.882998256))
            ThreePointArc((0, -56.882998256), (-0.3, -57.182998256), (-0.6, -56.882998256))
        make_face()
        with BuildLine():
            Line((-1.4, -56.882998256), (-0.8, -56.882998256))
            ThreePointArc((-0.8, -56.882998256), (-1.1, -57.182998256), (-1.4, -56.882998256))
        make_face()
        with BuildLine():
            Line((-2.2, -56.882998256), (-1.6, -56.882998256))
            ThreePointArc((-1.6, -56.882998256), (-1.9, -57.182998256), (-2.2, -56.882998256))
        make_face()
        with BuildLine():
            Line((-3, -56.882998256), (-2.4, -56.882998256))
            ThreePointArc((-2.4, -56.882998256), (-2.7, -57.182998256), (-3, -56.882998256))
        make_face()
        with BuildLine():
            Line((-3.8, -56.882998256), (-3.2, -56.882998256))
            ThreePointArc((-3.2, -56.882998256), (-3.5, -57.182998256), (-3.8, -56.882998256))
        make_face()
        with BuildLine():
            Line((-4.6, -56.882998256), (-4, -56.882998256))
            ThreePointArc((-4, -56.882998256), (-4.3, -57.182998256), (-4.6, -56.882998256))
        make_face()
    extrude(amount=CLIPS_RIBBS_DEPTH, both=True)

    # Sketch11 → Boss-Extrude7 (add)
    with BuildSketch(Plane(origin=(0, 0, 0), x_dir=(1, 0, 0), z_dir=(0, 1, 0))):
        with BuildLine():
            Line((-19.4, 0), (-18.6, 0))
            ThreePointArc((-18.6, 0), (-19, 1), (-19.4, 0))
        make_face()
        with BuildLine():
            Line((-0.4, 0), (0.4, 0))
            ThreePointArc((0.4, 0), (0, 1), (-0.4, 0))
        make_face()
        with BuildLine():
            Line((18.6, 0), (19.4, 0))
            ThreePointArc((19.4, 0), (19, 1), (18.6, 0))
        make_face()
    extrude(amount=-BOSS_EXTRUDE7_DEPTH)

    # Sketch11<2> → Boss-Extrude8 (add, along a direction that is not the sketch's normal)
    with BuildSketch(Plane(origin=(0, 0, 0), x_dir=(1, 0, 0), z_dir=(0, 1, 0))):
        with BuildLine():
            Line((18.6, 0), (19.4, 0))
            ThreePointArc((19.4, 0), (19, 1), (18.6, 0))
        make_face()
    boss_extrude8 = extrude(amount=-BOSS_EXTRUDE8_DEPTH, dir=(0.4198978370787637, 0.9075713781386983, 0))

    # Mirror2: Boss-Extrude8 across plane
    add(boss_extrude8.mirror(Plane(origin=(0, 0, 0), x_dir=(0, 0, 1), z_dir=(1, 0, 0))))


solid = part.part
